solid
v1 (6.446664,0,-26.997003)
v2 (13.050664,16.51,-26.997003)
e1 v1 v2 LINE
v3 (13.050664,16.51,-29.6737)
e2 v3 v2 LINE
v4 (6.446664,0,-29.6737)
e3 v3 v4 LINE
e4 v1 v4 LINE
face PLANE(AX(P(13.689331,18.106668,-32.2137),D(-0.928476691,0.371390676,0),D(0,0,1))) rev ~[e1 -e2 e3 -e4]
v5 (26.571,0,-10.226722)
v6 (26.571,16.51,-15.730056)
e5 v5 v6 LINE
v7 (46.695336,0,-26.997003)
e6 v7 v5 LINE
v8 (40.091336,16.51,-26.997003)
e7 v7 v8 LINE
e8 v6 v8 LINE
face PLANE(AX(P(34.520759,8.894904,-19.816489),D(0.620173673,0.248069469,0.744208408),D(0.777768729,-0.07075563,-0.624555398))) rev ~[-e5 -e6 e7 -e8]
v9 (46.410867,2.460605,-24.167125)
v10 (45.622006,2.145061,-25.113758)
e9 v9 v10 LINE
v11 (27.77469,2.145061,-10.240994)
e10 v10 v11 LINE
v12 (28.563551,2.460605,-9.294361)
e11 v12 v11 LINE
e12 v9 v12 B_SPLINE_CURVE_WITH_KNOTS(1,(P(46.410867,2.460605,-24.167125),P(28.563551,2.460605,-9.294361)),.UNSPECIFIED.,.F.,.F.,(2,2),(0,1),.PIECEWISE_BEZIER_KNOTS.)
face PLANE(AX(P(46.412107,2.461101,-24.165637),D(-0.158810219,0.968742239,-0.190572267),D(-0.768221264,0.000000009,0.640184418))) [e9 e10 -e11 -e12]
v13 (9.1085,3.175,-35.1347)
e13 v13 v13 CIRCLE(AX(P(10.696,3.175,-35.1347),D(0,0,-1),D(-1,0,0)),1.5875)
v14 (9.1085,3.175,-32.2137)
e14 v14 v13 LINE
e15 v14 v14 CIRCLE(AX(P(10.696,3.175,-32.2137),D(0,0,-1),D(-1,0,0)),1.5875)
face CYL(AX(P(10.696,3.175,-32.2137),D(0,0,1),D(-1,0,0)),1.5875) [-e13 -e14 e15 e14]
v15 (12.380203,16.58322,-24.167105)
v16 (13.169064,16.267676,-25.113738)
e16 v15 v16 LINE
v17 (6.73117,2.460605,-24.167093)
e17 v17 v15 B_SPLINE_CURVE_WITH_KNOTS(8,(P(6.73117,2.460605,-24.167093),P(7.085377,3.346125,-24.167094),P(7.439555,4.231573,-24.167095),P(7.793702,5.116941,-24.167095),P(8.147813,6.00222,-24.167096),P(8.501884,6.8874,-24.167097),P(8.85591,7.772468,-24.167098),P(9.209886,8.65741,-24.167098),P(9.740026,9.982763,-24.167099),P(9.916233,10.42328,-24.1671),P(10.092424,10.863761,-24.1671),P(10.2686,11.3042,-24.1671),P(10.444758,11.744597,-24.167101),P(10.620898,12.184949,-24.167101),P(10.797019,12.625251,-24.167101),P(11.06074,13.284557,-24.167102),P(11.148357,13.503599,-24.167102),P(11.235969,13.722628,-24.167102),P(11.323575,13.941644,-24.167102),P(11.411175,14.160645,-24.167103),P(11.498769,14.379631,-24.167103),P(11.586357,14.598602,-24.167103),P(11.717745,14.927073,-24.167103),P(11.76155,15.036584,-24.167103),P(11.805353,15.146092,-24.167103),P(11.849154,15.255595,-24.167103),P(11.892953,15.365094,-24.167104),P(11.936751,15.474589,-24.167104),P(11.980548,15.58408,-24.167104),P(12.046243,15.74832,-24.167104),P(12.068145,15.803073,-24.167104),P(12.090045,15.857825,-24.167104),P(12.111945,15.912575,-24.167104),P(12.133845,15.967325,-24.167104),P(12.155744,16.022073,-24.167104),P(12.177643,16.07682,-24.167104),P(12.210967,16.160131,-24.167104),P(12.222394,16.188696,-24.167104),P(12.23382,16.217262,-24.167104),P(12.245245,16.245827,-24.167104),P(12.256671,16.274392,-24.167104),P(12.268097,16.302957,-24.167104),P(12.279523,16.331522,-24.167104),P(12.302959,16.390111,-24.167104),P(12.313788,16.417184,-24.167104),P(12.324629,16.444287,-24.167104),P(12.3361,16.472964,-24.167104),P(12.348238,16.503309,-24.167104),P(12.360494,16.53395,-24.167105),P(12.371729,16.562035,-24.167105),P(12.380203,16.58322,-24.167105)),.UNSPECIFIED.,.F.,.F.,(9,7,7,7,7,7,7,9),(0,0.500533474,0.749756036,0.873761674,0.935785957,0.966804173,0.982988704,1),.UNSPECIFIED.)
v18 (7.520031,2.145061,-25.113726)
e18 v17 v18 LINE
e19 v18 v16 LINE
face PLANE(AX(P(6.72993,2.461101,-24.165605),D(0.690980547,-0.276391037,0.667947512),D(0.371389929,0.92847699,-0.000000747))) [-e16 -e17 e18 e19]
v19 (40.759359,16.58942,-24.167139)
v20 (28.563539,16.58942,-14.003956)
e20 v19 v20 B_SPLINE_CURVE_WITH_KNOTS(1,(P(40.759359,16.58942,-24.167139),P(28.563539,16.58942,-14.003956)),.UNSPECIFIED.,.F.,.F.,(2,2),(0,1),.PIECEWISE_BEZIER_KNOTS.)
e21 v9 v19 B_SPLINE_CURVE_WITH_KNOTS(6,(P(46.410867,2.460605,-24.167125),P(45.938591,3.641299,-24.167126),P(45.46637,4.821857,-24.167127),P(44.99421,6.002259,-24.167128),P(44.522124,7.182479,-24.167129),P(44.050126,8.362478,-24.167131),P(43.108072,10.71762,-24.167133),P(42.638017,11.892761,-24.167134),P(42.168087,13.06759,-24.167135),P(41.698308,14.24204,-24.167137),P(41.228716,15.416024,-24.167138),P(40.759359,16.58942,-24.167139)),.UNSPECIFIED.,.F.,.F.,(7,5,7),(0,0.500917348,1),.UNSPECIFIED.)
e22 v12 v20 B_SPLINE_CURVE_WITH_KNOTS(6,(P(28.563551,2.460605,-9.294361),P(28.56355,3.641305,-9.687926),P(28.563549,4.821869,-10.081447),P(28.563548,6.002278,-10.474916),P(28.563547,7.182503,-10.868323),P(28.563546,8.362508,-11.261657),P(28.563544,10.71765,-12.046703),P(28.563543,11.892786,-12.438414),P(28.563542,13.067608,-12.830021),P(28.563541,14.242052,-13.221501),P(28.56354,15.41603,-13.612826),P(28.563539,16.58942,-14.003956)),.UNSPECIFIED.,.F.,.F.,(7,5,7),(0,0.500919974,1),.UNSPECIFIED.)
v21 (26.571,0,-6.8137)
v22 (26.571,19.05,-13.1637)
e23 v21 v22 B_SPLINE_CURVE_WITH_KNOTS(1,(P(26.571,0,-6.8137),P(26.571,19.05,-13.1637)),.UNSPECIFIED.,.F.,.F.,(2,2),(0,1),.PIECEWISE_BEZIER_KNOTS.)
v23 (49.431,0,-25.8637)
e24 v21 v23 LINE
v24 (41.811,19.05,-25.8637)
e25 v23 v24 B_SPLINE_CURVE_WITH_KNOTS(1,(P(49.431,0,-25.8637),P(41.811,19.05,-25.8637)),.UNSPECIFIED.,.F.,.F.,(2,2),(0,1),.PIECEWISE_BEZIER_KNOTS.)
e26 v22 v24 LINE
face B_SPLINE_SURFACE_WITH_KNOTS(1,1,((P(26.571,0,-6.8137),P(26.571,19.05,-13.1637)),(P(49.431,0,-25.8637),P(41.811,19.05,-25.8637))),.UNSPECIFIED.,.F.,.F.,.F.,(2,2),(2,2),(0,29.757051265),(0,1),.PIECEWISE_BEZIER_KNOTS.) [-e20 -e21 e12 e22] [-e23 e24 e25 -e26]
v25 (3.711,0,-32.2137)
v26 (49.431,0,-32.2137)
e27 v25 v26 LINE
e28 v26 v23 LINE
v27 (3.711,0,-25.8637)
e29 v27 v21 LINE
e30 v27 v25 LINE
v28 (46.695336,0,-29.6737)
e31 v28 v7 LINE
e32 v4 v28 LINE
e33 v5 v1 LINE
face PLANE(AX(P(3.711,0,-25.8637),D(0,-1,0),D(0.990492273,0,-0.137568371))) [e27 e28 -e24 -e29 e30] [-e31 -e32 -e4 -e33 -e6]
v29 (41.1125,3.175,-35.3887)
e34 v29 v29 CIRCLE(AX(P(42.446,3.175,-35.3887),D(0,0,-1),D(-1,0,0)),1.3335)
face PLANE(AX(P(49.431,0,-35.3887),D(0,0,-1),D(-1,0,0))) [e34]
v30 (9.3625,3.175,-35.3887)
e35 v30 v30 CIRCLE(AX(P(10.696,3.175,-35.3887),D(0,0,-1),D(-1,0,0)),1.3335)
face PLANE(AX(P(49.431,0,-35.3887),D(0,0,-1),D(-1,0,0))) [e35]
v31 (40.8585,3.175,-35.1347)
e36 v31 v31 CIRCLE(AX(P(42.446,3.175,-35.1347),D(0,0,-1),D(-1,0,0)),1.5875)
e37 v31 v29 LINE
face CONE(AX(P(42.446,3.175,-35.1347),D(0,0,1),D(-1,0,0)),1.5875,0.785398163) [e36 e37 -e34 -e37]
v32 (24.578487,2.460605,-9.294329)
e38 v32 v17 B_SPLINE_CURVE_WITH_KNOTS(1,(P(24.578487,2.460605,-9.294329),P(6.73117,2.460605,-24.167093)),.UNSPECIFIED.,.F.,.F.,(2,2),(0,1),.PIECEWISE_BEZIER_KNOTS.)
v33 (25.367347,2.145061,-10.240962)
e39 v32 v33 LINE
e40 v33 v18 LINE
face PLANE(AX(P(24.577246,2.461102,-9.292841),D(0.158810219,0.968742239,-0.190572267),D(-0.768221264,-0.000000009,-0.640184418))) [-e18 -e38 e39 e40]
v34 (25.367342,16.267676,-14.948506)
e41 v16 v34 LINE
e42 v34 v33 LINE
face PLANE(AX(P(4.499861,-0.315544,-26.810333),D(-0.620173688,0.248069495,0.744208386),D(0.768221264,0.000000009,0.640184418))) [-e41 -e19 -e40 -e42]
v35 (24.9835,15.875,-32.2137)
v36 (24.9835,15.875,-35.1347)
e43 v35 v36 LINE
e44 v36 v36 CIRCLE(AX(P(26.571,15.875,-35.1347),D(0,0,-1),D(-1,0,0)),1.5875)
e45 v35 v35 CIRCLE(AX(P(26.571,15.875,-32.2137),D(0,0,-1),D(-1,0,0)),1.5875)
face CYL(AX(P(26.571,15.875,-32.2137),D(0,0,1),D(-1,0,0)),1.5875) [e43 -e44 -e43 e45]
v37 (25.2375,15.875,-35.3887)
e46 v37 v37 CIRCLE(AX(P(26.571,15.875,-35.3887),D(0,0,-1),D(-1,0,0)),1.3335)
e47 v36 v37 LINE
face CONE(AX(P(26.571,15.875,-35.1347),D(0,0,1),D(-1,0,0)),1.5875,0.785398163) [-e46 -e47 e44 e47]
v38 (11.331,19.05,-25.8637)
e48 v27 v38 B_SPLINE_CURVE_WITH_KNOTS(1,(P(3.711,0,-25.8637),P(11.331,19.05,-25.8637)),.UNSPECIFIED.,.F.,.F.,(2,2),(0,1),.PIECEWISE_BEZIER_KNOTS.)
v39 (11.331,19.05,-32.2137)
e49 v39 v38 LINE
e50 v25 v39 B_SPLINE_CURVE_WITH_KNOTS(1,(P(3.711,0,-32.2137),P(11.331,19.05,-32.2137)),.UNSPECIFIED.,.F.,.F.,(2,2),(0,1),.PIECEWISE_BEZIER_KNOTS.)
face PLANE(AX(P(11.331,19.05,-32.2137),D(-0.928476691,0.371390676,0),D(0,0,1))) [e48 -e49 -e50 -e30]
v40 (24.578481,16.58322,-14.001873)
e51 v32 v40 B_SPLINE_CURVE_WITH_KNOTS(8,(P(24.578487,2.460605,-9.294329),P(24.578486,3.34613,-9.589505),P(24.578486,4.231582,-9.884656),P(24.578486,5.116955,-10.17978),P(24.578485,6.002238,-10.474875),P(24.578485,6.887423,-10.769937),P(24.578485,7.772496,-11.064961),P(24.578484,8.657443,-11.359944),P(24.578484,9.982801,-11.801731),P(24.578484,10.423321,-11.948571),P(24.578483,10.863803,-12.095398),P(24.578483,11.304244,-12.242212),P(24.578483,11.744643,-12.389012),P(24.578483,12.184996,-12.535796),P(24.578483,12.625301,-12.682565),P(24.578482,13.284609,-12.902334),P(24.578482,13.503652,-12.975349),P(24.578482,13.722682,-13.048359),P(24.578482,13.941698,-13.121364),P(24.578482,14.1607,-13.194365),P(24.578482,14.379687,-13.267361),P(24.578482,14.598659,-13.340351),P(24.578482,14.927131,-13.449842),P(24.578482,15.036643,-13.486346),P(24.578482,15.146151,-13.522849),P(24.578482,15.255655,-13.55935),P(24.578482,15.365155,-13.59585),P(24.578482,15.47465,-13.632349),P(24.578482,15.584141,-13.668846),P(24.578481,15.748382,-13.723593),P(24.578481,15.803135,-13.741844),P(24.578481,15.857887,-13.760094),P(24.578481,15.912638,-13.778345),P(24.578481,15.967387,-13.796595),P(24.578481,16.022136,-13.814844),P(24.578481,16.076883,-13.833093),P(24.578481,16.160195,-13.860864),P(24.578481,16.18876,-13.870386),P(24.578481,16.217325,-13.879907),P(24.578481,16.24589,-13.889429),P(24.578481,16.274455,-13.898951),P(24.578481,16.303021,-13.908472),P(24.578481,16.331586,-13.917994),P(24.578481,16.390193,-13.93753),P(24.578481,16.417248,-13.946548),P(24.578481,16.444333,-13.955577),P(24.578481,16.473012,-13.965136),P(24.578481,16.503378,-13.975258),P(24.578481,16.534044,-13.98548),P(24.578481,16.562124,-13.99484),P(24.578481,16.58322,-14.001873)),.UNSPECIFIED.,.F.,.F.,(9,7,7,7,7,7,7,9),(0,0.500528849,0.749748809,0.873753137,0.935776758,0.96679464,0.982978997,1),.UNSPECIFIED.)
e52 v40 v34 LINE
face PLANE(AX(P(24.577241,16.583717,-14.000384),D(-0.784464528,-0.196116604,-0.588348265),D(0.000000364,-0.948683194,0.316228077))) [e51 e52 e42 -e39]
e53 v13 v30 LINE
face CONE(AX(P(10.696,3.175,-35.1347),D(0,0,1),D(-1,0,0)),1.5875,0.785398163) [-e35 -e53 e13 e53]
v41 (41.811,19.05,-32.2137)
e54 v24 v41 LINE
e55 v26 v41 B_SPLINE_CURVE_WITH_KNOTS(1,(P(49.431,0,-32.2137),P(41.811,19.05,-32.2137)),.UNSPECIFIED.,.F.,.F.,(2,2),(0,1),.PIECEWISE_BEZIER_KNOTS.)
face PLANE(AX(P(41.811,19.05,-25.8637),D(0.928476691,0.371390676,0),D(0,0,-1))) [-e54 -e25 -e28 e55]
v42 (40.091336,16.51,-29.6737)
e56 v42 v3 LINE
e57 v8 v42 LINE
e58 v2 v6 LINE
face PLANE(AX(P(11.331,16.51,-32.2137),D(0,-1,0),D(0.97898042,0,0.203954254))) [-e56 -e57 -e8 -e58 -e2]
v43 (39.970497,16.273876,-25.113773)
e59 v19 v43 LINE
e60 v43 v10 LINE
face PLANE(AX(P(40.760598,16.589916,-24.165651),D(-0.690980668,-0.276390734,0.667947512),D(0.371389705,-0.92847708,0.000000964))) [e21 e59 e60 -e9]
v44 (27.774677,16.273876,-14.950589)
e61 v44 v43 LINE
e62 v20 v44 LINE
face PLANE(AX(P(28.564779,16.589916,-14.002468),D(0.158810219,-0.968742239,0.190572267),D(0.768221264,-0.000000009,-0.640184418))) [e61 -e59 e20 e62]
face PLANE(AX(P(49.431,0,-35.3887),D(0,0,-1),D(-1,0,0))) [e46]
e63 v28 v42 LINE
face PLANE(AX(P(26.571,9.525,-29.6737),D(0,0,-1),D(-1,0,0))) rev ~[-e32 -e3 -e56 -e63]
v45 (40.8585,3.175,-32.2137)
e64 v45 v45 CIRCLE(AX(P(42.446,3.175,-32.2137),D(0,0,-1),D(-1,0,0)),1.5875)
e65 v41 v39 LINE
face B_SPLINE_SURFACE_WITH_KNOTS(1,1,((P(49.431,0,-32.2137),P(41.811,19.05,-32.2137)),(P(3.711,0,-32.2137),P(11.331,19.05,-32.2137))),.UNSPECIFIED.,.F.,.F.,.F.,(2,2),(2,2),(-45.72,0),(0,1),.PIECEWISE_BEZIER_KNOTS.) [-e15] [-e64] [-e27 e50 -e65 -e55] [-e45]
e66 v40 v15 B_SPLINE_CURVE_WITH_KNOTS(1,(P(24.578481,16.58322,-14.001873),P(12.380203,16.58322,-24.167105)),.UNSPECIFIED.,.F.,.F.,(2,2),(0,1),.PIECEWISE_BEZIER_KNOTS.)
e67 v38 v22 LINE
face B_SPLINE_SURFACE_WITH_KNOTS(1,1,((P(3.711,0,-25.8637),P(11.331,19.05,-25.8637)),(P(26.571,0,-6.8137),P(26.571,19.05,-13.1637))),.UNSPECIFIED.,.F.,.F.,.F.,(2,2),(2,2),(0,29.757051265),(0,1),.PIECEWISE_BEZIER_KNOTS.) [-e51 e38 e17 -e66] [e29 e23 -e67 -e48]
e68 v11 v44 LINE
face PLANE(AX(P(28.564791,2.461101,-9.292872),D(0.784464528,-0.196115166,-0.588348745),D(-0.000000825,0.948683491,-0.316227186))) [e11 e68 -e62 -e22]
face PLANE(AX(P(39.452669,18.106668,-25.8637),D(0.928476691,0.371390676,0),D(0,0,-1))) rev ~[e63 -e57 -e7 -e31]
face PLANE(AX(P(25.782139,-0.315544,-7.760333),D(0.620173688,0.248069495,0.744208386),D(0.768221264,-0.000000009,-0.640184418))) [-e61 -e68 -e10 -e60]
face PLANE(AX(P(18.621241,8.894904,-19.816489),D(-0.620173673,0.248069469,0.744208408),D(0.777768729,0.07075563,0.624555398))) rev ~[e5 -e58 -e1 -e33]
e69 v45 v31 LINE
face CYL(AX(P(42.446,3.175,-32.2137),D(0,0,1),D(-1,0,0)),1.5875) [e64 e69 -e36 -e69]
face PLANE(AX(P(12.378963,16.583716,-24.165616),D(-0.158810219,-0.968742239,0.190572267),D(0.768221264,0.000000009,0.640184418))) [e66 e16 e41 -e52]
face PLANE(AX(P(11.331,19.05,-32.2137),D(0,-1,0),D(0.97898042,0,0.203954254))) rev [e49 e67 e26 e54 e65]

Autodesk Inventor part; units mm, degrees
ref_plane "YZ Plane" through (0, 0, 0) normal (1, 0, 0) x (0, 1, 0)
ref_plane "XZ Plane" through (0, 0, 0) normal (0, 1, 0) x (-1, 0, 0)
sketch "Sketch1" plane through (0, 0, 0) normal (0, 1, 0) x (-1, 0, 0)
  line L0 (-3.711, -25.8637) -> (-3.711, -32.2137)
  line L1 (-3.711, -32.2137) -> (-49.431, -32.2137)
  line L2 (-49.431, -32.2137) -> (-49.431, -25.8637)
  line L3 (-3.711, -25.8637) -> (-26.571, -6.8137)
  line L4 (-26.571, -6.8137) -> (-49.431, -25.8637)
  point P0 (0, 0)
  dimension "d0" = 6.35
  dimension "d1" = 6.35
  dimension "d2" = 45.72
  dimension "d3" = 22.86
  dimension "d4" = 22.86
  dimension "d5" = 25.4
ref_plane "Work Plane2" through (0, 19.05, 0) normal (0, 1, 0) x (1, 0, 0)
sketch "Sketch2" plane through (0, 19.05, 0) normal (0, 1, 0) x (1, 0, 0)
  line L0 (41.811, 32.2137) -> (11.331, 32.2137)
  line L1 (11.331, 32.2137) -> (11.331, 25.8637)
  line L2 (11.331, 25.8637) -> (26.571, 13.1637)
  line L3 (26.571, 13.1637) -> (41.811, 25.8637)
  line L4 (41.811, 25.8637) -> (41.811, 32.2137)
  point P0 (0, 0)
  point P1 (26.571, 6.8137)
  dimension "d8" = 6.35
  dimension "d9" = 6.35
  dimension "d10" = 15.24
  dimension "d11" = 15.24
  dimension "d12" = 30.48
  dimension "d15" = 0
loft "Loft1" add profiles "Sketch1", "Sketch2"
shell "Shell1" thickness 2.54 removed faces 1 at (26.571, 0, -23.7471)
sketch "Sketch4" plane through (26.571, 0, -6.8137) normal (0.6201737, 0.2480695, 0.7442084) x (0.7682213, 0, -0.6401844)
  line L0 (0, 0) -> (4.0652, 19.6647) projected
  line L1 (29.7571, 0) -> (23.9032, 19.6647) projected
  line L2 (29.7571, 0) -> (0, 0) projected
  line L3 (23.9032, 19.6647) -> (4.0652, 19.6647) projected
  line L4 (3.1188, 2.54) -> (6.1338, 17.1247)
  line L5 (6.1338, 17.1247) -> (22.0092, 17.1247)
  line L6 (22.0092, 17.1247) -> (26.3508, 2.54)
  line L7 (26.3508, 2.54) -> (3.1188, 2.54)
  point P0 (-24.7744, 2.9212)
  dimension "d21" = 2.54
  dimension "d22" = 2.54
  dimension "d23" = 2.54
  dimension "d24" = 2.54
extrude "Extrusion2" cut sketch "Sketch4" against normal blind 1.27 contours L4 L5 L6 L7
sketch "Sketch5" plane through (3.711, 0, -25.8637) normal (-0.6201737, 0.2480695, 0.7442084) x (0.7682213, 0, 0.6401844)
  line L0 (29.7571, 0) -> (0, 0)
  line L1 (24.1888, 19.6583) -> (4.3507, 19.6583)
  line L2 (3.4063, 2.54) -> (7.746, 17.1183)
  line L3 (7.746, 17.1183) -> (23.6246, 17.1183)
  line L4 (23.6246, 17.1183) -> (26.6383, 2.54)
  line L5 (26.6383, 2.54) -> (3.4063, 2.54)
  line L6 (0, 0) -> (5.8538, 19.6647) projected
  line L7 (29.7571, 0) -> (25.6919, 19.6647) projected
  point P0 (13.7067, -5.5182)
  point P1 (-24.7744, 2.9212)
  dimension "d27" = 2.54
  dimension "d29" = 2.54
  dimension "d32" = 2.54
  dimension "d34" = 2.54
extrude "Extrusion3" cut sketch "Sketch5" against normal blind 1.27
sketch "Sketch6" plane through (49.431, 0, -32.2137) normal (0, 0, -1) x (-1, 0, 0)
  circle A0 centre (6.985, 3.175) radius 1.5875
  circle A1 centre (22.86, 15.875) radius 1.5875
  circle A2 centre (38.735, 3.175) radius 1.5875
  line L0 (0, 0) -> (7.62, 19.05) projected
  line L1 (45.72, 0) -> (0, 0) projected
  line L2 (45.72, 0) -> (38.1, 19.05) projected
  line L3 (38.1, 19.05) -> (7.62, 19.05) projected
  point P0 (49.431, 0)
  dimension "d37" = 6.985
  dimension "d38" = 6.985
  dimension "d39" = 3.175
  dimension "d40" = 3.175
  dimension "d41" = 3.175
  dimension "d42" = 22.86
  dimension "d43" = 3.175
  dimension "d44" = 3.175
  dimension "d45" = 3.175
extrude "Extrusion4" add sketch "Sketch6" along normal blind 3.175 contours A0 | A1 | A2
chamfer "Chamfer1" distance 0.254 angle 45 3 edges at (44.0335, 3.175, -35.3887) (28.1585, 15.875, -35.3887) (12.2835, 3.175, -35.3887)
properties part number "Cow Catcher"
